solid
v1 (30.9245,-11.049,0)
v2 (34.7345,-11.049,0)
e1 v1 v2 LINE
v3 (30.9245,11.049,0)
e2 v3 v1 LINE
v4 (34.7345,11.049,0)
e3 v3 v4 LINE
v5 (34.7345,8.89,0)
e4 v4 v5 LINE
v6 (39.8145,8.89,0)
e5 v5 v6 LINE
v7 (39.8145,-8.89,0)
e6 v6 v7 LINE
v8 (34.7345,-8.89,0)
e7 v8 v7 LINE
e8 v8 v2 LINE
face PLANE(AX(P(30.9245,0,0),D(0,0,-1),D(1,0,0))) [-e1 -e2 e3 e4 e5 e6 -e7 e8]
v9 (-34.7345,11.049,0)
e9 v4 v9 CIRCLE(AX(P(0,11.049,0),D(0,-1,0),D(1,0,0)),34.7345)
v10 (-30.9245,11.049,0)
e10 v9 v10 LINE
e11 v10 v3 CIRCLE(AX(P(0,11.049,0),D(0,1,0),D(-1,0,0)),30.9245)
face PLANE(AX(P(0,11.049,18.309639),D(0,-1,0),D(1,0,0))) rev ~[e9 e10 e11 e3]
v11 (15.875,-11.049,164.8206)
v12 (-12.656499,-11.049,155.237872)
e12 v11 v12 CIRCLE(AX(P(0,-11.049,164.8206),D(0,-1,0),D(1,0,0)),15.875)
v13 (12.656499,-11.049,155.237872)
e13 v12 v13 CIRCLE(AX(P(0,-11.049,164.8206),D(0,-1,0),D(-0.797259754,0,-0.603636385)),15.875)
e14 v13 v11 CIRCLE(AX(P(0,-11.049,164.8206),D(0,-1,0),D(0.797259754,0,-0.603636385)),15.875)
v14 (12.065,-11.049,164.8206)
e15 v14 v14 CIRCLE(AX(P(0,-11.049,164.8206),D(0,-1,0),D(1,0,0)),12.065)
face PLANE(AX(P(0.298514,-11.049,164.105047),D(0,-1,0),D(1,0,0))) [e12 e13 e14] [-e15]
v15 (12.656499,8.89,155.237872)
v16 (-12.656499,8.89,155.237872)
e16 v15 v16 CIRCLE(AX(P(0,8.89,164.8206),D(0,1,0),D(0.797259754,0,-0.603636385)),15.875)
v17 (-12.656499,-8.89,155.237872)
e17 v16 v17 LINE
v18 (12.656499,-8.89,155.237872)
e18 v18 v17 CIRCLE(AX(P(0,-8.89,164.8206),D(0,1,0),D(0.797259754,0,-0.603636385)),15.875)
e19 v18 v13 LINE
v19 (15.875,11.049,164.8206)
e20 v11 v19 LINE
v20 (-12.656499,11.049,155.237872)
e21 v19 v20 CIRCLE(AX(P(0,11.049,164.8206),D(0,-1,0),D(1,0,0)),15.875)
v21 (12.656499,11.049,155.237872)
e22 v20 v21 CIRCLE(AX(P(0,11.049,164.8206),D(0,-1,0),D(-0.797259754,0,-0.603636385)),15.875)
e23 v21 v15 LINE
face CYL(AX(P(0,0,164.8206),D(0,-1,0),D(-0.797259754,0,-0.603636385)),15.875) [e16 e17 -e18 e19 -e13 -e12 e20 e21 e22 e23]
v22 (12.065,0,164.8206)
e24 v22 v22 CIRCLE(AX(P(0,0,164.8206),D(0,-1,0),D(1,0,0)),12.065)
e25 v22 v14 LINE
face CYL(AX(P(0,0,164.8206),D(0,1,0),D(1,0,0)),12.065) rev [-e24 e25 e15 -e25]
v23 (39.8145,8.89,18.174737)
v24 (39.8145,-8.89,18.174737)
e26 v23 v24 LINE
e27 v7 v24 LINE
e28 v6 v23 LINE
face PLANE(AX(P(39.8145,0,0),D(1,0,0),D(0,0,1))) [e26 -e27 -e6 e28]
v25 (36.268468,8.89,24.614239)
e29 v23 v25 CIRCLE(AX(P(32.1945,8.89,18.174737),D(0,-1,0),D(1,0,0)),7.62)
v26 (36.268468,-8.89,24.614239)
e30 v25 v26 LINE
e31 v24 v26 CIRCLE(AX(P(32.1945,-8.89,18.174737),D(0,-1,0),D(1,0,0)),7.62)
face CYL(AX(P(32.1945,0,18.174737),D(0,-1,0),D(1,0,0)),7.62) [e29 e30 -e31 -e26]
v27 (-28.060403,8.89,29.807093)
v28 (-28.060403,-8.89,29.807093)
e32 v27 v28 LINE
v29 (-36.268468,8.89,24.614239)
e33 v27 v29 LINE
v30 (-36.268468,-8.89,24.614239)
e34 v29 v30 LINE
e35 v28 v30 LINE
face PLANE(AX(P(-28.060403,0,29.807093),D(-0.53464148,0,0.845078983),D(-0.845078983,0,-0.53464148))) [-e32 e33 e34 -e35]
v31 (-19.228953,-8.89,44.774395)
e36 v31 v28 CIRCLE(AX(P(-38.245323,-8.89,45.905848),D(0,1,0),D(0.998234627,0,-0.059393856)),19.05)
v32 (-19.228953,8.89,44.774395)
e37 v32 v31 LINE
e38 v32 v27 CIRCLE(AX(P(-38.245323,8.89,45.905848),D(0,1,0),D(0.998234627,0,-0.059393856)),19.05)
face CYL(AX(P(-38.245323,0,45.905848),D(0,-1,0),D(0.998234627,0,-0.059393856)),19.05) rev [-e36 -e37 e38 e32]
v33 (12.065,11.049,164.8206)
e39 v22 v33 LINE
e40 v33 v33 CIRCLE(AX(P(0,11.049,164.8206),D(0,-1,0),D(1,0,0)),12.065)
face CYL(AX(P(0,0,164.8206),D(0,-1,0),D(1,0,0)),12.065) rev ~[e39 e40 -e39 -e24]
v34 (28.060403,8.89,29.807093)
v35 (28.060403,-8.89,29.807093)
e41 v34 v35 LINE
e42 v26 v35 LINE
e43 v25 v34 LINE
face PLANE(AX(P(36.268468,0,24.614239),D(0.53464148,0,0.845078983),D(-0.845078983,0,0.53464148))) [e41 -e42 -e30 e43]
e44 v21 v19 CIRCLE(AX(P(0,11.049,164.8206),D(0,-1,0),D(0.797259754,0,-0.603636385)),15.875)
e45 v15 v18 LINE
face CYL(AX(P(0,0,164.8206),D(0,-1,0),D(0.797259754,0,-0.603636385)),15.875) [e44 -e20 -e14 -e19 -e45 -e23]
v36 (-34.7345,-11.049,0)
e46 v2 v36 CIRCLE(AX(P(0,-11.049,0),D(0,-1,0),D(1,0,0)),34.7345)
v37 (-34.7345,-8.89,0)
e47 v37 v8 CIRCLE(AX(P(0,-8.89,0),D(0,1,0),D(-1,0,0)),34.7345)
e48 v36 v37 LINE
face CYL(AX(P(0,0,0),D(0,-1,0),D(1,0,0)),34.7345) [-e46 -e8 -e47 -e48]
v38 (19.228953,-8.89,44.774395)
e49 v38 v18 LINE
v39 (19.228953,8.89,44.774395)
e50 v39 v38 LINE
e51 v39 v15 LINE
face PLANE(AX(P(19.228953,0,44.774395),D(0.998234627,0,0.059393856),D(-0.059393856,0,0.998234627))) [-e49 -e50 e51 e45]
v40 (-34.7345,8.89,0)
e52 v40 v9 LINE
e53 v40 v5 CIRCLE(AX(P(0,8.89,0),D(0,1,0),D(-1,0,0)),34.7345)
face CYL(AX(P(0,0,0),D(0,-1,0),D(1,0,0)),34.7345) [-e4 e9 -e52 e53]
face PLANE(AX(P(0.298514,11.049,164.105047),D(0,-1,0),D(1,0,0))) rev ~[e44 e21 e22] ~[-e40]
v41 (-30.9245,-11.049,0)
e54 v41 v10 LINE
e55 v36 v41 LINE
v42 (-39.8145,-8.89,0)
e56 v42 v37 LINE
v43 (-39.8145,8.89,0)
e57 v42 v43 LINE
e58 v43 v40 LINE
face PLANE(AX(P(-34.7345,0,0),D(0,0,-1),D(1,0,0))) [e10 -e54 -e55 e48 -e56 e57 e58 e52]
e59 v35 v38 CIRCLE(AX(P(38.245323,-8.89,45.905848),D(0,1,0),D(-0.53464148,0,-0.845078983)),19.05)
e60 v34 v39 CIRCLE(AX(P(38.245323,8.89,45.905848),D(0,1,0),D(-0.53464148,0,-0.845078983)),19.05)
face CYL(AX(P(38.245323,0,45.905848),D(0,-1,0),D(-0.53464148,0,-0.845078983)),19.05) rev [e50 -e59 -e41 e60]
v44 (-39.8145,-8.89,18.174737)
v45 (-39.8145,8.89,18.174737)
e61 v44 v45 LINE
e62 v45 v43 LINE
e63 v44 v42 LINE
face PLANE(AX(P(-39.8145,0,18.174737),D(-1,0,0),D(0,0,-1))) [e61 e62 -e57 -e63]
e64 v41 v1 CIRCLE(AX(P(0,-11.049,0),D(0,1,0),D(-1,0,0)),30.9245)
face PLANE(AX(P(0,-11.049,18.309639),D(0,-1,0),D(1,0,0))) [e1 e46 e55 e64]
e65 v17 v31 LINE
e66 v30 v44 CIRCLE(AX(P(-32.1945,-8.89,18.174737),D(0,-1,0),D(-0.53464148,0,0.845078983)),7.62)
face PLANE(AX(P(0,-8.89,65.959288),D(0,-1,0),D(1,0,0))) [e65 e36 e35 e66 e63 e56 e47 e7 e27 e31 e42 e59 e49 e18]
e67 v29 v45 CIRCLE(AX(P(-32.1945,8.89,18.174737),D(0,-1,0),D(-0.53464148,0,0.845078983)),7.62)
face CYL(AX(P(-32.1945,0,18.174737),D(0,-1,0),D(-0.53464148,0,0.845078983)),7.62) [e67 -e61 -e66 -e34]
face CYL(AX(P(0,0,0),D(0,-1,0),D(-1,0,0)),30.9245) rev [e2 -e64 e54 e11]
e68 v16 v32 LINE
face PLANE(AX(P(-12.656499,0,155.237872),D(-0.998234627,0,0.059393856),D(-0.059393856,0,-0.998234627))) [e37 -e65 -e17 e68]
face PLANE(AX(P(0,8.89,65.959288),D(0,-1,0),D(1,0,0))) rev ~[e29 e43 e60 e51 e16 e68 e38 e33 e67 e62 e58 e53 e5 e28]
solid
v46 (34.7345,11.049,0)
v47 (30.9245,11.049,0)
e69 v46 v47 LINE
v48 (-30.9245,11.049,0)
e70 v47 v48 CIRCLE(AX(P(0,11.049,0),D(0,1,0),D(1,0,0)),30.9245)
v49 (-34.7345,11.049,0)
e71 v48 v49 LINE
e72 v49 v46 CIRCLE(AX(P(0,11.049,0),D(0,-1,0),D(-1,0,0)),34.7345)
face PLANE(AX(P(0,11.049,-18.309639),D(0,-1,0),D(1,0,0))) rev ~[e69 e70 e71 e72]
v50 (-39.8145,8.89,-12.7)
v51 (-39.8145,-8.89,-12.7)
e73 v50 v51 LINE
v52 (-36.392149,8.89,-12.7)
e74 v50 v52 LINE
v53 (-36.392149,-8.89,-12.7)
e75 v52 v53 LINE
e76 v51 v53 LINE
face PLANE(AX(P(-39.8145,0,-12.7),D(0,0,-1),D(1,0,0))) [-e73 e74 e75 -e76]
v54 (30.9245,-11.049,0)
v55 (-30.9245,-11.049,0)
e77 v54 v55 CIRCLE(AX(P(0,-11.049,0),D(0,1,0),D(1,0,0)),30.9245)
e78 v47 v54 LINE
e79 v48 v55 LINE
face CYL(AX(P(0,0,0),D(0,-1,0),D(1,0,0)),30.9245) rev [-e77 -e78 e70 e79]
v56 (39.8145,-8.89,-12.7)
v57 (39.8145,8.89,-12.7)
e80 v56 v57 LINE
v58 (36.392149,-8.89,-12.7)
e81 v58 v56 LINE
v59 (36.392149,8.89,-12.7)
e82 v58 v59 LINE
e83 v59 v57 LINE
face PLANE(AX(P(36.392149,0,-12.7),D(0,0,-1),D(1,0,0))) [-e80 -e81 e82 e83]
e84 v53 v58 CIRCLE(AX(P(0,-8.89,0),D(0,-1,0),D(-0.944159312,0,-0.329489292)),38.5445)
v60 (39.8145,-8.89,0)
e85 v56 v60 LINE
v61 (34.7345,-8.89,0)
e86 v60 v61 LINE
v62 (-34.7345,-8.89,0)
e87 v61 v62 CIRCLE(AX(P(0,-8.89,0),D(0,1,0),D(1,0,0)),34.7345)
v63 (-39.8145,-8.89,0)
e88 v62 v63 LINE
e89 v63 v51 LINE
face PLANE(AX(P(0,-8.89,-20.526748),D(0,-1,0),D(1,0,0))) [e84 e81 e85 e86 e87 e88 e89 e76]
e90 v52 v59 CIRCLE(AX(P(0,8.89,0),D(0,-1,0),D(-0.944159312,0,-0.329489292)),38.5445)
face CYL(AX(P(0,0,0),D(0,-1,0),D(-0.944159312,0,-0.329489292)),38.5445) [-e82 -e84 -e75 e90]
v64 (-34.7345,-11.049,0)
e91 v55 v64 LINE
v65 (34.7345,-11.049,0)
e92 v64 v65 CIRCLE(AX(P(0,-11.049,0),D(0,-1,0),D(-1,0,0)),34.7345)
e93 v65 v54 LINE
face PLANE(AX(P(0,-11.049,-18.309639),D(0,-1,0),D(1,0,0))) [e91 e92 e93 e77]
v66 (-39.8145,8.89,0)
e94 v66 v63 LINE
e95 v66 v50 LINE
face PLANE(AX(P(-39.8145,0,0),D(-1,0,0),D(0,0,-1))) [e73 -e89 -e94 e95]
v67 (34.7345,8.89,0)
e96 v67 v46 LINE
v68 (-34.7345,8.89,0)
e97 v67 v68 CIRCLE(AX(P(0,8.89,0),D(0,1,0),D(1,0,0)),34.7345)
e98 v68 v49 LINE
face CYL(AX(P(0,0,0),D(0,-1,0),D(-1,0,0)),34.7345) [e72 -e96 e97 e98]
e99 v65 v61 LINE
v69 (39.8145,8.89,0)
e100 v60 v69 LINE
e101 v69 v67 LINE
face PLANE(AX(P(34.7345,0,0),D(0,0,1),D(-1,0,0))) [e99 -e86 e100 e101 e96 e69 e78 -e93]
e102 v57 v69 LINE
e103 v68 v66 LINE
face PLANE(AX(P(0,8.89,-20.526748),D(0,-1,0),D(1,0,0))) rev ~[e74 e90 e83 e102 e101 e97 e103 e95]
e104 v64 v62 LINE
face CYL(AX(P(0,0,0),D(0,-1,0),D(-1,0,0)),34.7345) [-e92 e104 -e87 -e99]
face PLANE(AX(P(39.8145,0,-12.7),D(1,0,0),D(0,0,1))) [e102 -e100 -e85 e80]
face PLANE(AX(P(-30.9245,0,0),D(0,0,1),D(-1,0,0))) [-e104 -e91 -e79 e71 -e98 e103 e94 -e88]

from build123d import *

# Parameters (mm, degrees)
F1_DEPTH = 11.049
F2_DEPTH = 8.89
F0_R     = 12.065
F3_DEPTH = 11.049
F4_DEPTH = 11.049
F5_DEPTH = 8.89


with BuildPart() as f1:
    # F0 (on Front) → F1 (new body, symmetric)
    with BuildSketch(Plane.XZ):
        with BuildLine():
            ThreePointArc((-30.9245, 0), (0, 30.9245), (30.9245, 0))
            Line((30.9245, 0), (34.7345, 0))
            ThreePointArc((34.7345, 0), (0, 34.7345), (-34.7345, 0))
            Line((-34.7345, 0), (-30.9245, 0))
        make_face()
    extrude(amount=F1_DEPTH, both=True)

    # F0 (on Front) → F2 (join, symmetric)
    with BuildSketch(Plane.XZ):
        with BuildLine():
            ThreePointArc((-34.7345, 0), (0, 34.7345), (34.7345, 0))
            Line((34.7345, 0), (39.8145, 0))
            Line((39.8145, 0), (39.8145, 18.174736774))
            ThreePointArc((39.8145, 18.174736774), (38.8693796529, 21.8503838762), (36.2684680788, 24.6142386253))
            Line((36.2684680788, 24.6142386253), (28.0604028001, 29.8070930892))
            ThreePointArc((28.0604028001, 29.8070930892), (21.8384993627, 36.2250090023), (19.2289533596, 44.7743947528))
            Line((19.2289533596, 44.7743947528), (12.6564985929, 155.2378723942))
            ThreePointArc((12.6564985929, 155.2378723942), (0, 148.9456), (-12.6564985929, 155.2378723942))
            Line((-12.6564985929, 155.2378723942), (-19.2289533596, 44.7743947528))
            ThreePointArc((-19.2289533596, 44.7743947528), (-21.8384993627, 36.2250090023), (-28.0604028001, 29.8070930892))
            Line((-28.0604028001, 29.8070930892), (-36.2684680788, 24.6142386253))
            ThreePointArc((-36.2684680788, 24.6142386253), (-38.8693796529, 21.8503838762), (-39.8145, 18.174736774))
            Line((-39.8145, 18.174736774), (-39.8145, 0))
            Line((-39.8145, 0), (-34.7345, 0))
        make_face()
    extrude(amount=F2_DEPTH, both=True)

    # F0 (on Front) → F3 (join, symmetric)
    with BuildSketch(Plane.XZ):
        with BuildLine():
            ThreePointArc((-12.6564985929, 155.2378723942), (0, 148.9456), (12.6564985929, 155.2378723942))
            ThreePointArc((12.6564985929, 155.2378723942), (15.048879363, 159.7662103318), (15.875, 164.8206))
            ThreePointArc((15.875, 164.8206), (-5.0543896682, 179.869479363), (-12.6564985929, 155.2378723942))
        make_face()
        with Locations((0, 164.8206)):
            Circle(F0_R, mode=Mode.SUBTRACT)
    extrude(amount=F3_DEPTH, both=True)


with BuildPart() as f4:
    # F0 (on Front) → F4 (new body, symmetric)
    with BuildSketch(Plane.XZ):
        with BuildLine():
            Line((34.7345, 0), (30.9245, 0))
            ThreePointArc((30.9245, 0), (0, -30.9245), (-30.9245, 0))
            Line((-30.9245, 0), (-34.7345, 0))
            ThreePointArc((-34.7345, 0), (0, -34.7345), (34.7345, 0))
        make_face()
    extrude(amount=F4_DEPTH, both=True)

    # F0 (on Front) → F5 (join, symmetric)
    with BuildSketch(Plane.XZ):
        with BuildLine():
            Line((39.8145, 0), (34.7345, 0))
            ThreePointArc((34.7345, 0), (0, -34.7345), (-34.7345, 0))
            Line((-34.7345, 0), (-39.8145, 0))
            Line((-39.8145, 0), (-39.8145, -12.7))
            Line((-39.8145, -12.7), (-36.3921486072, -12.7))
            ThreePointArc((-36.3921486072, -12.7), (0, -38.5445), (36.3921486072, -12.7))
            Line((36.3921486072, -12.7), (39.8145, -12.7))
            Line((39.8145, -12.7), (39.8145, 0))
        make_face()
    extrude(amount=F5_DEPTH, both=True)


solid = Compound([f1.part, f4.part])
